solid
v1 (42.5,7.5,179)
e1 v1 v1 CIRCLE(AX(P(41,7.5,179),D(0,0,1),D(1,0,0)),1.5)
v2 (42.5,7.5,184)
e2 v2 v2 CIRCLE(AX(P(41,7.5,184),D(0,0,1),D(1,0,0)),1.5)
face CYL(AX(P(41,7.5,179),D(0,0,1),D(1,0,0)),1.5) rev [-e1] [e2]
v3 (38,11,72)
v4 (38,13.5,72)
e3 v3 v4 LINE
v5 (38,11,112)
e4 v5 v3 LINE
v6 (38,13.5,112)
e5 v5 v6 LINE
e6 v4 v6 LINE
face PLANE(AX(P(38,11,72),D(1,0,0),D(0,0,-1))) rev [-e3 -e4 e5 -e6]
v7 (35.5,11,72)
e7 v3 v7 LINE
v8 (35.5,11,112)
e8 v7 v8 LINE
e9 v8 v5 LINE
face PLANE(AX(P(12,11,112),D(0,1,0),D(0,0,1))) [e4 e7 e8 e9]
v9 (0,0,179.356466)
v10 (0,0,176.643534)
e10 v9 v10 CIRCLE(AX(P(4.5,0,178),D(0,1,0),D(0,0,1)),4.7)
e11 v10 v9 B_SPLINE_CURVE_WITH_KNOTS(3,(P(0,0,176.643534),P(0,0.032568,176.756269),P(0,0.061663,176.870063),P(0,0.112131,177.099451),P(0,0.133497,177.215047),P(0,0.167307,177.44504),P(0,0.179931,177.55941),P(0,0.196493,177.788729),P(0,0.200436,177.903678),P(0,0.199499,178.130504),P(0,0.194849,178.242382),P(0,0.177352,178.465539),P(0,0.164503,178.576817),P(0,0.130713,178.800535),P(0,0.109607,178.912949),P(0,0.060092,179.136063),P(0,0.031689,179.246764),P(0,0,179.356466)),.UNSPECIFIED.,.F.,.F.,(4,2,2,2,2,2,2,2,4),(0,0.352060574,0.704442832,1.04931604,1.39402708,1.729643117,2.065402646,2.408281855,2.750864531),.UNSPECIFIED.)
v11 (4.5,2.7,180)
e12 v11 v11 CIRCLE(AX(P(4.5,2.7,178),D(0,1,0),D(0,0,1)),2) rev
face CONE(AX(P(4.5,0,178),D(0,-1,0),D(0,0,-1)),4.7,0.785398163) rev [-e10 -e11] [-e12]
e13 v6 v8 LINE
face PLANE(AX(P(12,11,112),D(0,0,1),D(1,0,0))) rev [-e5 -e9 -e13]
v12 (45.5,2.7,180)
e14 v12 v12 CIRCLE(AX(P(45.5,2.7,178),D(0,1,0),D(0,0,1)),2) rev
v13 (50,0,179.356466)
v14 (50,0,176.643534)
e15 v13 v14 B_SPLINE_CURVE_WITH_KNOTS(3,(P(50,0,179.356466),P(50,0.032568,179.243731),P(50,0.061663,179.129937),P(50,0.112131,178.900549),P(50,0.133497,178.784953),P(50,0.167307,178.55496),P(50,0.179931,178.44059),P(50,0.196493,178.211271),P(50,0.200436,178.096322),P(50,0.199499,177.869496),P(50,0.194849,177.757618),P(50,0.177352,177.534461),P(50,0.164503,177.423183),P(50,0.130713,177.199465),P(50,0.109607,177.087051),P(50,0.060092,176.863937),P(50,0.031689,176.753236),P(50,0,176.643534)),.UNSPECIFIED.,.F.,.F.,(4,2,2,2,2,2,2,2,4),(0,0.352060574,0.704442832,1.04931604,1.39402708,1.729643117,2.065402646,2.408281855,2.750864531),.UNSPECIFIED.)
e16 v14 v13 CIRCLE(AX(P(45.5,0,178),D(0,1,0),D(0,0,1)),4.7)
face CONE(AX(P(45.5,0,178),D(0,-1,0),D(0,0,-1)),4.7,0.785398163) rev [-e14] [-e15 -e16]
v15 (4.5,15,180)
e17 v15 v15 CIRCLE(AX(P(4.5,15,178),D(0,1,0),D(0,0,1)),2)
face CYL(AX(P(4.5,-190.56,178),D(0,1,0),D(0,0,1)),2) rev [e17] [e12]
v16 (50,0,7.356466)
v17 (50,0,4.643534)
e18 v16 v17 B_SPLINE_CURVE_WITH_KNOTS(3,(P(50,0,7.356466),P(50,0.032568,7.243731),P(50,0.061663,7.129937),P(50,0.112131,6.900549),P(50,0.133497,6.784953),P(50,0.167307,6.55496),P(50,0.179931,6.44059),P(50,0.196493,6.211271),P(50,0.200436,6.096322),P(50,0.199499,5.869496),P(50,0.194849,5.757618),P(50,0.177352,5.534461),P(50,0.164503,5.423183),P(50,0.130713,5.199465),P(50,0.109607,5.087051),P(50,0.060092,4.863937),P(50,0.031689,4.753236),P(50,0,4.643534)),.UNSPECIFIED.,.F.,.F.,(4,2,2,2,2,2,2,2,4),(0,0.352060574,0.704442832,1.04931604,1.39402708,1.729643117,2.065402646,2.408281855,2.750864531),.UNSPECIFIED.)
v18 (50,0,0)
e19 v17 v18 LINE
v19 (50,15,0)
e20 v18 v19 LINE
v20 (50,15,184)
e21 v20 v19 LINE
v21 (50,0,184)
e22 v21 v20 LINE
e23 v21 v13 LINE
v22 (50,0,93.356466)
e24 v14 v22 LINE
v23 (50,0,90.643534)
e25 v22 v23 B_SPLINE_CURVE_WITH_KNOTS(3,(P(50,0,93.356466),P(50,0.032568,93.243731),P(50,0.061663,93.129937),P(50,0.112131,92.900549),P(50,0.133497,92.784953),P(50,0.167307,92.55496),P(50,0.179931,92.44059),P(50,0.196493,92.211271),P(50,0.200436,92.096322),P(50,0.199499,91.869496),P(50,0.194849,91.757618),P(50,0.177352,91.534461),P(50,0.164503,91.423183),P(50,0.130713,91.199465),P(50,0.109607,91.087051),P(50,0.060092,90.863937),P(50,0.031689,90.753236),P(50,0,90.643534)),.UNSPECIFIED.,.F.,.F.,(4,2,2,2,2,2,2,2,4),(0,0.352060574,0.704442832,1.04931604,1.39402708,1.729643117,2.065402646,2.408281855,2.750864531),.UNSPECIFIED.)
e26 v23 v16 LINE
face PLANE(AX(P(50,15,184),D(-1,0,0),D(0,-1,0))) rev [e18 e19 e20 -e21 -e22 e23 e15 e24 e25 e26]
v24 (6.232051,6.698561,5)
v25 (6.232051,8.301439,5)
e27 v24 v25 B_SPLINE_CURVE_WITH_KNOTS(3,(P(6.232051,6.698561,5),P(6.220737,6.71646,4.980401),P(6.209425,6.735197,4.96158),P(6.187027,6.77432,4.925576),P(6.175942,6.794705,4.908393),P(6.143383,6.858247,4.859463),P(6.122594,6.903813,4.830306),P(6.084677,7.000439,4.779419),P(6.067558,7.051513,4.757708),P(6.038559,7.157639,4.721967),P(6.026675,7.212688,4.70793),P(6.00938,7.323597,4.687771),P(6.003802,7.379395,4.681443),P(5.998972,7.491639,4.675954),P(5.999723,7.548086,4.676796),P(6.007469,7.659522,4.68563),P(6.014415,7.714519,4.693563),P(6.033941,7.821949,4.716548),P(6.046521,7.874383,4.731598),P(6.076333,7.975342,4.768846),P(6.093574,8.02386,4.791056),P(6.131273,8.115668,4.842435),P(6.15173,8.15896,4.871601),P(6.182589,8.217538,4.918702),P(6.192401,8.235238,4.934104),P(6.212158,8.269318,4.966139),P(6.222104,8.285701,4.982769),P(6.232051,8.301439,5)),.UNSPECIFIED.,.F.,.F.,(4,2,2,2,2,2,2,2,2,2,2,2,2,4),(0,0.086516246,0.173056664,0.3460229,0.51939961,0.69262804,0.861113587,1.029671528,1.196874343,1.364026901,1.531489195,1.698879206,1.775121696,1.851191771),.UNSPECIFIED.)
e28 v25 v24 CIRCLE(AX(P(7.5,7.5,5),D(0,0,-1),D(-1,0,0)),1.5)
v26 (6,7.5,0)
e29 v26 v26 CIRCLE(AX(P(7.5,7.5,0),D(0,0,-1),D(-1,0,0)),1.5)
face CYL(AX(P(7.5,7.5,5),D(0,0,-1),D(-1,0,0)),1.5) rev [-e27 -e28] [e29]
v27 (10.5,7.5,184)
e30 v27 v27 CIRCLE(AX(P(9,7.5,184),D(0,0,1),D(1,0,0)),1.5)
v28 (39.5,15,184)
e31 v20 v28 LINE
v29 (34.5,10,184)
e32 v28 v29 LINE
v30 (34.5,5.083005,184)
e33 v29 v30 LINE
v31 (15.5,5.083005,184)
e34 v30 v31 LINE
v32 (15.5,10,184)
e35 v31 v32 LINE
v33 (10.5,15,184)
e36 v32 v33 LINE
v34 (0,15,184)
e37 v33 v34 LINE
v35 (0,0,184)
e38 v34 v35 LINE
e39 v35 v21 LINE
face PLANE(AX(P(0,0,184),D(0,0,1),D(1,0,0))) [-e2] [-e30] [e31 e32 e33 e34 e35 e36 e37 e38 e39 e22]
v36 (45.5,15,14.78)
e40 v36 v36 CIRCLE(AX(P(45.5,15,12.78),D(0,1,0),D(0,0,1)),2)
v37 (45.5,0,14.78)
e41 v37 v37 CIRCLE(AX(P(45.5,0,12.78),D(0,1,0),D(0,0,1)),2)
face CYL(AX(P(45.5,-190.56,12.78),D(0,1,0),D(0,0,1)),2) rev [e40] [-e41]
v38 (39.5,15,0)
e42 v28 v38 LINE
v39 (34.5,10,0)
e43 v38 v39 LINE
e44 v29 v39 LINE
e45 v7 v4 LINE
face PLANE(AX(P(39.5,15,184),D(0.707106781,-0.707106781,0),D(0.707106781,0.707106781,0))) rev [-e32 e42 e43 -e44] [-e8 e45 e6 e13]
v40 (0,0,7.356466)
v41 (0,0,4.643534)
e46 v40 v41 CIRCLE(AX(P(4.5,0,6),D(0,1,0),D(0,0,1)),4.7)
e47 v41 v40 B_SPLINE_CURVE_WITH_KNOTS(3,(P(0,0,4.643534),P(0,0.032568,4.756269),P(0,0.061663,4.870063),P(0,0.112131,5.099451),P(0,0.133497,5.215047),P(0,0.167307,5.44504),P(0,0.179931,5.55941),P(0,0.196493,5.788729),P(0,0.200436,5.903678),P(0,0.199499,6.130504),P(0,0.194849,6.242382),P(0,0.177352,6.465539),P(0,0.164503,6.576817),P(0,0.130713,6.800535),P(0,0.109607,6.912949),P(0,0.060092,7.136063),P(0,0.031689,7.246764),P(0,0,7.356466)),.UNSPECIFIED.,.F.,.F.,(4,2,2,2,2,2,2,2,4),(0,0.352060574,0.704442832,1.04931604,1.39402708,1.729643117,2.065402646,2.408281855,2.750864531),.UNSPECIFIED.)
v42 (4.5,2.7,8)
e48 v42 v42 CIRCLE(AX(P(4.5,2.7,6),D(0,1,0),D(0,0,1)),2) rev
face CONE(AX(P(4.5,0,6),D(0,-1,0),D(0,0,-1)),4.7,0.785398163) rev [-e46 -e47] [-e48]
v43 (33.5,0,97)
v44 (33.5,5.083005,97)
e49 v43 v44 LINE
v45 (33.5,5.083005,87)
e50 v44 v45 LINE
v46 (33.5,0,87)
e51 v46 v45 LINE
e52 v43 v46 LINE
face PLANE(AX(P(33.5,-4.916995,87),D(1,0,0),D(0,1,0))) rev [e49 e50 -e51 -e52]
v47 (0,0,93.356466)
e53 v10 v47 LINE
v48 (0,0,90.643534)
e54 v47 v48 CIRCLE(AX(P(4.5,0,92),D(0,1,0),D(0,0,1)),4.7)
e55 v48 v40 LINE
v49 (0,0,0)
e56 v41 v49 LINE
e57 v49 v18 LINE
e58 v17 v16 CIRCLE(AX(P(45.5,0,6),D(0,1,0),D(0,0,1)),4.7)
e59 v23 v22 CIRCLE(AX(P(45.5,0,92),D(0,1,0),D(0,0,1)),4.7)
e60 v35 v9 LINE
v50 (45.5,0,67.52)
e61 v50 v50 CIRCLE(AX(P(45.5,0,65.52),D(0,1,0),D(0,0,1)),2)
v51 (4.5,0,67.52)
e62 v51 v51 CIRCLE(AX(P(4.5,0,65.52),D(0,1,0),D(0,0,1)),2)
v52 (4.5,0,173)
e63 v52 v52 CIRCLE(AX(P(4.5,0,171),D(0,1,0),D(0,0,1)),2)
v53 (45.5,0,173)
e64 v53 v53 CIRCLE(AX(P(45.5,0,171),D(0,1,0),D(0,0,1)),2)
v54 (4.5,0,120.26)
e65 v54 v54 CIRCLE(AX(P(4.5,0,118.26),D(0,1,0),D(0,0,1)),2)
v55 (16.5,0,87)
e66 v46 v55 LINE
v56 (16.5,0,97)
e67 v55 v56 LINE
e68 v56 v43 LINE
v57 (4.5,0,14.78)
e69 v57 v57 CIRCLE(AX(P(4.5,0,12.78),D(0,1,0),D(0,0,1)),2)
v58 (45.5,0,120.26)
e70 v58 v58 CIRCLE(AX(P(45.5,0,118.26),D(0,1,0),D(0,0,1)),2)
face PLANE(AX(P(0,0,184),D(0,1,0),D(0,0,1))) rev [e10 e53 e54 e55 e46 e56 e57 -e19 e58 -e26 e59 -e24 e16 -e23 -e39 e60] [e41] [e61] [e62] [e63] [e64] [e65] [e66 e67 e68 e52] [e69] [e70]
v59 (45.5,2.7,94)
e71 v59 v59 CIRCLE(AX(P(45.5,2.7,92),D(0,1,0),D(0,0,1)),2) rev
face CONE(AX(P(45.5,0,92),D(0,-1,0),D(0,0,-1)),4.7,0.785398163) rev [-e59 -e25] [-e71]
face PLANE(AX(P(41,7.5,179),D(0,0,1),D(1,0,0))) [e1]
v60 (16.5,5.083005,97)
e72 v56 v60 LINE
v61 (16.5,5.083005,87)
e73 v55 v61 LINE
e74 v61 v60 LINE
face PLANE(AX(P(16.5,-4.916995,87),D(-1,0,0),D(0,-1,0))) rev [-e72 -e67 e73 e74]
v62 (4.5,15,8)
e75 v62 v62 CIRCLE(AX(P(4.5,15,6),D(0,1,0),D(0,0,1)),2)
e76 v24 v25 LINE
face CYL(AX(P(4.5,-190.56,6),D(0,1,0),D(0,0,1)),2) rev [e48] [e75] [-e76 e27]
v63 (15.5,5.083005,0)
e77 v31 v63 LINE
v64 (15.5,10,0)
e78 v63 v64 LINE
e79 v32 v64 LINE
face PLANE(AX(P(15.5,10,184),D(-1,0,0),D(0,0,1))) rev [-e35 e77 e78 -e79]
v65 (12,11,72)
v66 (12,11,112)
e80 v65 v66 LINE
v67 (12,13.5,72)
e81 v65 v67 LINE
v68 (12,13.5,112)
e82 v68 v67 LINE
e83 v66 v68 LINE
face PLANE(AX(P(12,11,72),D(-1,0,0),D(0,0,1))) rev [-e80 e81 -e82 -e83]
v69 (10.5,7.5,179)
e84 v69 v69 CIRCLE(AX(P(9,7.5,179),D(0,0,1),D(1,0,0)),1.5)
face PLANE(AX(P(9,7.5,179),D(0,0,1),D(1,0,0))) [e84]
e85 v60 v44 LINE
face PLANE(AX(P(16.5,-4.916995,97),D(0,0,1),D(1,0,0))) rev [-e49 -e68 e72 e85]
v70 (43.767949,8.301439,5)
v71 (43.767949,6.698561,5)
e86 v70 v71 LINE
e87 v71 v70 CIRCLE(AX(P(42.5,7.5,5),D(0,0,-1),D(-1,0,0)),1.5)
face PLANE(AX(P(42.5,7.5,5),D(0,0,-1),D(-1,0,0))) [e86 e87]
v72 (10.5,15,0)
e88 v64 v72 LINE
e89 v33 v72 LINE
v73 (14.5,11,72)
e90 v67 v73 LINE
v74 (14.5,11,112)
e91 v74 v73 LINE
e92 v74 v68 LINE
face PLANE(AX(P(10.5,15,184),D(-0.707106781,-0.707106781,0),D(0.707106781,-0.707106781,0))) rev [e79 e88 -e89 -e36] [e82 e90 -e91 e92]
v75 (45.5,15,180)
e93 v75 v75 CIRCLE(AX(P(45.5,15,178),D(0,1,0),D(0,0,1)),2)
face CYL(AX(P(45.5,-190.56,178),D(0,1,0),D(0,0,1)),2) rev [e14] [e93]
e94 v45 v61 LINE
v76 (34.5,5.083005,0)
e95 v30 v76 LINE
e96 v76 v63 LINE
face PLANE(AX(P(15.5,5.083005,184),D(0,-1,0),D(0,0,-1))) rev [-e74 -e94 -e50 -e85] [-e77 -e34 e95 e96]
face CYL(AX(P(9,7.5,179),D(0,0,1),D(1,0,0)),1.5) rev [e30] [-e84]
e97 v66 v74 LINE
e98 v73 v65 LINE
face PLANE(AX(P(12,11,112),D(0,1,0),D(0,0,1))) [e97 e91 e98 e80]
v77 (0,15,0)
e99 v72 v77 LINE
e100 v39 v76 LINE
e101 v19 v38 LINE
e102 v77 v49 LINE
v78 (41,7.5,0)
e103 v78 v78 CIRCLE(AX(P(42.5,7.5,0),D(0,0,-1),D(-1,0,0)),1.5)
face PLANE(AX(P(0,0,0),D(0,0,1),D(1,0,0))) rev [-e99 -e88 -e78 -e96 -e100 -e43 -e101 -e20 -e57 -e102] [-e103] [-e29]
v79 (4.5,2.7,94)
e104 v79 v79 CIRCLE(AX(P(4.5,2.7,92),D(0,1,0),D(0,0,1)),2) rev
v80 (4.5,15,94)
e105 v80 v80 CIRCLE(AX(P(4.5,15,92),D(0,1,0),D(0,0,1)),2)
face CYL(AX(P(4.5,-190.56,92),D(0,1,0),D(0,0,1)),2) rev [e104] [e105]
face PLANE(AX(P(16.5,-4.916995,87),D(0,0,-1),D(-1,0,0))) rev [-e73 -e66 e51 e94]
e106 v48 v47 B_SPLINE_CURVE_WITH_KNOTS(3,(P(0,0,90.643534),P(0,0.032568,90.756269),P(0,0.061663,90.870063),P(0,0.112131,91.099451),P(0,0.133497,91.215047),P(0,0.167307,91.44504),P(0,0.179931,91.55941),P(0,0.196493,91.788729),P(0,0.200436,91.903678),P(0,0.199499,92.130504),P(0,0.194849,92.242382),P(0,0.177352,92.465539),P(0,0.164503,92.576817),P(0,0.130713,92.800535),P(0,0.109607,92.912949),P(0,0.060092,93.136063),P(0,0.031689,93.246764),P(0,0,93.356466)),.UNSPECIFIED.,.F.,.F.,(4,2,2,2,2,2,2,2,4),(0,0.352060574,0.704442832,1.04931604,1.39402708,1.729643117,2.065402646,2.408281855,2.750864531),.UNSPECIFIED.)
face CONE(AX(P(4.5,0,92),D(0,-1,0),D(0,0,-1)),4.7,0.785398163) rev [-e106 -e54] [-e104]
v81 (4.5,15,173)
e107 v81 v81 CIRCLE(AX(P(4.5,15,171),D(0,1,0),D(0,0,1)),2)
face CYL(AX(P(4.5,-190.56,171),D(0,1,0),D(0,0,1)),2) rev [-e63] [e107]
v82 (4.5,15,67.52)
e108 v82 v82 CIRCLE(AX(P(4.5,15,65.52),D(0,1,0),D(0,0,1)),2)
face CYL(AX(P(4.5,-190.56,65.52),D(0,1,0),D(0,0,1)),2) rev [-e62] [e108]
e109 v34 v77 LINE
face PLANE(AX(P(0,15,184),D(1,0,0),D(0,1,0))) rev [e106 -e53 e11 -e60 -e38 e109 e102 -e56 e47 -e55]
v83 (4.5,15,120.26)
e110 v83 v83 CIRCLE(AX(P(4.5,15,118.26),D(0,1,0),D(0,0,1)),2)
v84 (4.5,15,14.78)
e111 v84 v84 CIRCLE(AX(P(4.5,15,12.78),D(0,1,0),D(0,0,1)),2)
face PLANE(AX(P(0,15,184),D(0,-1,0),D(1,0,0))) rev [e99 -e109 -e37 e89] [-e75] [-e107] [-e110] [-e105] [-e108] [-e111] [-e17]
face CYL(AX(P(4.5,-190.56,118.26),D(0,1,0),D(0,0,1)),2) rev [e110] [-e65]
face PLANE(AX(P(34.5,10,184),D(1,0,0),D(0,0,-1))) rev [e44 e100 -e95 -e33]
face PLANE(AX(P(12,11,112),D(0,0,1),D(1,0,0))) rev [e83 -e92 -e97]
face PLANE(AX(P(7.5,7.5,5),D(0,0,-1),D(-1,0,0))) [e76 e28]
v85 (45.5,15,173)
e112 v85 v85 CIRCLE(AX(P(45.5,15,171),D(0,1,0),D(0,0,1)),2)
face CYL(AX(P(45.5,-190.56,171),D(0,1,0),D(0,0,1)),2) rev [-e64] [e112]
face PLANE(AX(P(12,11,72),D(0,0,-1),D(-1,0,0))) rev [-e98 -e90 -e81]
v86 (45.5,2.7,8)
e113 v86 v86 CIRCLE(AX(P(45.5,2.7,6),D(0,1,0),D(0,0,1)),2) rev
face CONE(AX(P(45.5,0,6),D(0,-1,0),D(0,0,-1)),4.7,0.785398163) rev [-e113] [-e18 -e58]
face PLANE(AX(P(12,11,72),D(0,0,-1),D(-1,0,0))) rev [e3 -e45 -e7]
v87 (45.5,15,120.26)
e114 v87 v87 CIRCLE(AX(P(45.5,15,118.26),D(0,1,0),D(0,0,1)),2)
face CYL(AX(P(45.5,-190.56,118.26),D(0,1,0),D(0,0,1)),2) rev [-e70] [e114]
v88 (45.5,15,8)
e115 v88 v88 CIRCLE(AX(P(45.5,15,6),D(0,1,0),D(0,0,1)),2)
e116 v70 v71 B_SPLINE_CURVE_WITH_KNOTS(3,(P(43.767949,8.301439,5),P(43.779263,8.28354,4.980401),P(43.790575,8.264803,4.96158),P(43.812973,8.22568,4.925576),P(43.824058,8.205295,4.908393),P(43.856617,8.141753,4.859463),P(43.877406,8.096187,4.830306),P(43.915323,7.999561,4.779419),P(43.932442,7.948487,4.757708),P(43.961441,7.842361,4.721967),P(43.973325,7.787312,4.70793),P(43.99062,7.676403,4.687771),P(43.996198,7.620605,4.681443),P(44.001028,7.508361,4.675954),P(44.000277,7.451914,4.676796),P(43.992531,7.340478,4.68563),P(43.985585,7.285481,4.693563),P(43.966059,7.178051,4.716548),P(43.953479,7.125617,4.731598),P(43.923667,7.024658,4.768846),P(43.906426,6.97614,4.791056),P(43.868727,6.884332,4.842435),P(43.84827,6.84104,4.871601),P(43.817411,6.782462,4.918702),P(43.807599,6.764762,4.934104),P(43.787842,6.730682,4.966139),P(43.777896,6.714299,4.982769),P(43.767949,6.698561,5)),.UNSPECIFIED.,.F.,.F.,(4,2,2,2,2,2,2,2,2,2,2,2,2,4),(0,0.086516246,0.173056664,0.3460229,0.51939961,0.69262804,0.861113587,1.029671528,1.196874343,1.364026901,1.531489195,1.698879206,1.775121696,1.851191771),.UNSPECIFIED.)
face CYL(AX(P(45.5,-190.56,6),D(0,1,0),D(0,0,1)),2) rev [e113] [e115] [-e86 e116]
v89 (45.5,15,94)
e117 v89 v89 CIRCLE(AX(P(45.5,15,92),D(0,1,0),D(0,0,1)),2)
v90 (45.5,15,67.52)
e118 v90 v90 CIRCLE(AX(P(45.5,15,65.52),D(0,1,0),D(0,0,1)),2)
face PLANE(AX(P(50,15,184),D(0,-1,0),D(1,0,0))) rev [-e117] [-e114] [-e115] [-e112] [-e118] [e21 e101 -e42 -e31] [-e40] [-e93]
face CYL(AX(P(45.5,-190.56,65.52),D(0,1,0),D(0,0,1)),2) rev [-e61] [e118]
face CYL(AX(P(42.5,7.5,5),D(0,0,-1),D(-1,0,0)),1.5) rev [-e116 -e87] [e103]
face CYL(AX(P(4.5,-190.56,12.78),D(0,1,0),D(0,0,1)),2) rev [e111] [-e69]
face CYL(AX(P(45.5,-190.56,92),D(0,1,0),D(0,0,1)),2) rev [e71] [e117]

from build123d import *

# Parameters (mm, degrees)
BOSS_EXTRU_1_DEPTH       = 184
ESQUISSE2_R              = 2
ENL_V_MAT_EXTRU_1_DEPTH  = 205.56
ESQUISSE4_R              = 2
ENL_V_MAT_EXTRU_2_DEPTH  = 205.56
CHANFREIN1_SIZE          = 2.7
ESQUISSE6_W              = 26
ESQUISSE6_H              = 40
ENL_V_MAT_EXTRU_3_DEPTH  = 4
ESQUISSE8_W              = 17
ESQUISSE8_H              = 10
ENL_V_MAT_EXTRU_6_DEPTH  = 10
ESQUISSE7_R              = 1.5
ENL_V_MAT_EXTRU_5_DEPTH  = 5
ESQUISSE9_R              = 1.5
ENL_V_MAT_EXTRU_10_DEPTH = 5


with BuildPart() as part:
    # Esquisse1 → Boss.-Extru.1 (new body)
    with BuildSketch(Plane.XY):
        Polygon((0, 0), (50, 0), (50, 15), (39.5, 15), (34.5, 10), (34.5, 5.083005244), (15.5, 5.083005244), (15.5, 10), (10.5, 15), (0, 15), align=None)
    extrude(amount=BOSS_EXTRU_1_DEPTH)

    # Esquisse2 → Enlèv. mat.-Extru.1 (cut)
    with BuildSketch(Plane(origin=(0, 15, 0), x_dir=(-1, 0, 0), z_dir=(0, 1, 0))):
        with Locations(Location((-4.5, 12.78, 0), (0, 0, 90))):
            Circle(ESQUISSE2_R)
        with Locations(Location((-45.5, 12.78, 0), (0, 0, 90))):
            Circle(ESQUISSE2_R)
        with Locations(Location((-4.5, 65.52, 0), (0, 0, 90))):
            Circle(ESQUISSE2_R)
        with Locations(Location((-45.5, 65.52, 0), (0, 0, 90))):
            Circle(ESQUISSE2_R)
        with Locations(Location((-4.5, 118.26, 0), (0, 0, 90))):
            Circle(ESQUISSE2_R)
        with Locations(Location((-45.5, 118.26, 0), (0, 0, 90))):
            Circle(ESQUISSE2_R)
        with Locations(Location((-4.5, 171, 0), (0, 0, 90))):
            Circle(ESQUISSE2_R)
        with Locations(Location((-45.5, 171, 0), (0, 0, 90))):
            Circle(ESQUISSE2_R)
    extrude(amount=-ENL_V_MAT_EXTRU_1_DEPTH, mode=Mode.SUBTRACT)

    # Esquisse4 → Enlèv. mat.-Extru.2 (cut)
    with BuildSketch(Plane(origin=(0, 15, 0), x_dir=(-1, 0, 0), z_dir=(0, 1, 0))):
        with Locations(Location((-4.5, 6, 0), (0, 0, 90))):
            Circle(ESQUISSE4_R)
        with Locations(Location((-45.5, 6, 0), (0, 0, 90))):
            Circle(ESQUISSE4_R)
        with Locations(Location((-45.5, 178, 0), (0, 0, 90))):
            Circle(ESQUISSE4_R)
        with Locations(Location((-4.5, 178, 0), (0, 0, 90))):
            Circle(ESQUISSE4_R)
        with Locations(Location((-4.5, 92, 0), (0, 0, 90))):
            Circle(ESQUISSE4_R)
        with Locations(Location((-45.5, 92, 0), (0, 0, 90))):
            Circle(ESQUISSE4_R)
    extrude(amount=-ENL_V_MAT_EXTRU_2_DEPTH, mode=Mode.SUBTRACT)

    # Chanfrein1
    # the kernel refuses this chamfer: 2.7 mm, written as the material it takes off along each edge
    with BuildSketch(Plane(origin=(4.5, 0, 6), x_dir=(0, 0, 1), z_dir=(-1, 0, 0))) as chanfrein1_piece_1:
        Polygon((2 + CHANFREIN1_SIZE, 0), (2, CHANFREIN1_SIZE), (2, 0), align=None)
    revolve(axis=Axis((4.5, 0, 6), (0, 1, 0)), mode=Mode.SUBTRACT)
    with BuildSketch(Plane(origin=(45.5, 0, 6), x_dir=(0, 0, 1), z_dir=(-1, 0, 0))) as chanfrein1_piece_2:
        Polygon((2 + CHANFREIN1_SIZE, 0), (2, CHANFREIN1_SIZE), (2, 0), align=None)
    revolve(axis=Axis((45.5, 0, 6), (0, 1, 0)), mode=Mode.SUBTRACT)
    with BuildSketch(Plane(origin=(45.5, 0, 178), x_dir=(0, 0, 1), z_dir=(-1, 0, 0))) as chanfrein1_piece_3:
        Polygon((2 + CHANFREIN1_SIZE, 0), (2, CHANFREIN1_SIZE), (2, 0), align=None)
    revolve(axis=Axis((45.5, 0, 178), (0, 1, 0)), mode=Mode.SUBTRACT)
    with BuildSketch(Plane(origin=(4.5, 0, 178), x_dir=(0, 0, 1), z_dir=(-1, 0, 0))) as chanfrein1_piece_4:
        Polygon((2 + CHANFREIN1_SIZE, 0), (2, CHANFREIN1_SIZE), (2, 0), align=None)
    revolve(axis=Axis((4.5, 0, 178), (0, 1, 0)), mode=Mode.SUBTRACT)
    with BuildSketch(Plane(origin=(4.5, 0, 92), x_dir=(0, 0, 1), z_dir=(-1, 0, 0))) as chanfrein1_piece_5:
        Polygon((2 + CHANFREIN1_SIZE, 0), (2, CHANFREIN1_SIZE), (2, 0), align=None)
    revolve(axis=Axis((4.5, 0, 92), (0, 1, 0)), mode=Mode.SUBTRACT)
    with BuildSketch(Plane(origin=(45.5, 0, 92), x_dir=(0, 0, 1), z_dir=(-1, 0, 0))) as chanfrein1_piece_6:
        Polygon((2 + CHANFREIN1_SIZE, 0), (2, CHANFREIN1_SIZE), (2, 0), align=None)
    revolve(axis=Axis((45.5, 0, 92), (0, 1, 0)), mode=Mode.SUBTRACT)

    # Esquisse6 → Enlèv. mat.-Extru.3 (cut)
    with BuildSketch(Plane(origin=(0, 15, 0), x_dir=(1, 0, 0), z_dir=(0, 1, 0))):
        with Locations((25, -92)):
            Rectangle(ESQUISSE6_W, ESQUISSE6_H)
    extrude(amount=-ENL_V_MAT_EXTRU_3_DEPTH, mode=Mode.SUBTRACT)

    # Esquisse8 → Enlèv. mat.-Extru.6 (cut)
    with BuildSketch(Plane(origin=(0, 5.083005244, 0), x_dir=(1, 0, 0), z_dir=(0, 1, 0))):
        with Locations((25, -92)):
            Rectangle(ESQUISSE8_W, ESQUISSE8_H)
    extrude(amount=-ENL_V_MAT_EXTRU_6_DEPTH, mode=Mode.SUBTRACT)

    # Esquisse7 → Enlèv. mat.-Extru.5 (cut)
    with BuildSketch(Plane.XY.offset(184)):
        with Locations((9, 7.5)):
            Circle(ESQUISSE7_R)
        with Locations((41, 7.5)):
            Circle(ESQUISSE7_R)
    extrude(amount=-ENL_V_MAT_EXTRU_5_DEPTH, mode=Mode.SUBTRACT)

    # Esquisse9 → Enlèv. mat.-Extru.10 (cut)
    with BuildSketch(Plane(origin=(0, 0, 0), x_dir=(-1, 0, 0), z_dir=(0, 0, -1))):
        with Locations((-42.5, 7.5)):
            Circle(ESQUISSE9_R)
        with Locations((-7.5, 7.5)):
            Circle(ESQUISSE9_R)
    extrude(amount=-ENL_V_MAT_EXTRU_10_DEPTH, mode=Mode.SUBTRACT)


solid = part.part
